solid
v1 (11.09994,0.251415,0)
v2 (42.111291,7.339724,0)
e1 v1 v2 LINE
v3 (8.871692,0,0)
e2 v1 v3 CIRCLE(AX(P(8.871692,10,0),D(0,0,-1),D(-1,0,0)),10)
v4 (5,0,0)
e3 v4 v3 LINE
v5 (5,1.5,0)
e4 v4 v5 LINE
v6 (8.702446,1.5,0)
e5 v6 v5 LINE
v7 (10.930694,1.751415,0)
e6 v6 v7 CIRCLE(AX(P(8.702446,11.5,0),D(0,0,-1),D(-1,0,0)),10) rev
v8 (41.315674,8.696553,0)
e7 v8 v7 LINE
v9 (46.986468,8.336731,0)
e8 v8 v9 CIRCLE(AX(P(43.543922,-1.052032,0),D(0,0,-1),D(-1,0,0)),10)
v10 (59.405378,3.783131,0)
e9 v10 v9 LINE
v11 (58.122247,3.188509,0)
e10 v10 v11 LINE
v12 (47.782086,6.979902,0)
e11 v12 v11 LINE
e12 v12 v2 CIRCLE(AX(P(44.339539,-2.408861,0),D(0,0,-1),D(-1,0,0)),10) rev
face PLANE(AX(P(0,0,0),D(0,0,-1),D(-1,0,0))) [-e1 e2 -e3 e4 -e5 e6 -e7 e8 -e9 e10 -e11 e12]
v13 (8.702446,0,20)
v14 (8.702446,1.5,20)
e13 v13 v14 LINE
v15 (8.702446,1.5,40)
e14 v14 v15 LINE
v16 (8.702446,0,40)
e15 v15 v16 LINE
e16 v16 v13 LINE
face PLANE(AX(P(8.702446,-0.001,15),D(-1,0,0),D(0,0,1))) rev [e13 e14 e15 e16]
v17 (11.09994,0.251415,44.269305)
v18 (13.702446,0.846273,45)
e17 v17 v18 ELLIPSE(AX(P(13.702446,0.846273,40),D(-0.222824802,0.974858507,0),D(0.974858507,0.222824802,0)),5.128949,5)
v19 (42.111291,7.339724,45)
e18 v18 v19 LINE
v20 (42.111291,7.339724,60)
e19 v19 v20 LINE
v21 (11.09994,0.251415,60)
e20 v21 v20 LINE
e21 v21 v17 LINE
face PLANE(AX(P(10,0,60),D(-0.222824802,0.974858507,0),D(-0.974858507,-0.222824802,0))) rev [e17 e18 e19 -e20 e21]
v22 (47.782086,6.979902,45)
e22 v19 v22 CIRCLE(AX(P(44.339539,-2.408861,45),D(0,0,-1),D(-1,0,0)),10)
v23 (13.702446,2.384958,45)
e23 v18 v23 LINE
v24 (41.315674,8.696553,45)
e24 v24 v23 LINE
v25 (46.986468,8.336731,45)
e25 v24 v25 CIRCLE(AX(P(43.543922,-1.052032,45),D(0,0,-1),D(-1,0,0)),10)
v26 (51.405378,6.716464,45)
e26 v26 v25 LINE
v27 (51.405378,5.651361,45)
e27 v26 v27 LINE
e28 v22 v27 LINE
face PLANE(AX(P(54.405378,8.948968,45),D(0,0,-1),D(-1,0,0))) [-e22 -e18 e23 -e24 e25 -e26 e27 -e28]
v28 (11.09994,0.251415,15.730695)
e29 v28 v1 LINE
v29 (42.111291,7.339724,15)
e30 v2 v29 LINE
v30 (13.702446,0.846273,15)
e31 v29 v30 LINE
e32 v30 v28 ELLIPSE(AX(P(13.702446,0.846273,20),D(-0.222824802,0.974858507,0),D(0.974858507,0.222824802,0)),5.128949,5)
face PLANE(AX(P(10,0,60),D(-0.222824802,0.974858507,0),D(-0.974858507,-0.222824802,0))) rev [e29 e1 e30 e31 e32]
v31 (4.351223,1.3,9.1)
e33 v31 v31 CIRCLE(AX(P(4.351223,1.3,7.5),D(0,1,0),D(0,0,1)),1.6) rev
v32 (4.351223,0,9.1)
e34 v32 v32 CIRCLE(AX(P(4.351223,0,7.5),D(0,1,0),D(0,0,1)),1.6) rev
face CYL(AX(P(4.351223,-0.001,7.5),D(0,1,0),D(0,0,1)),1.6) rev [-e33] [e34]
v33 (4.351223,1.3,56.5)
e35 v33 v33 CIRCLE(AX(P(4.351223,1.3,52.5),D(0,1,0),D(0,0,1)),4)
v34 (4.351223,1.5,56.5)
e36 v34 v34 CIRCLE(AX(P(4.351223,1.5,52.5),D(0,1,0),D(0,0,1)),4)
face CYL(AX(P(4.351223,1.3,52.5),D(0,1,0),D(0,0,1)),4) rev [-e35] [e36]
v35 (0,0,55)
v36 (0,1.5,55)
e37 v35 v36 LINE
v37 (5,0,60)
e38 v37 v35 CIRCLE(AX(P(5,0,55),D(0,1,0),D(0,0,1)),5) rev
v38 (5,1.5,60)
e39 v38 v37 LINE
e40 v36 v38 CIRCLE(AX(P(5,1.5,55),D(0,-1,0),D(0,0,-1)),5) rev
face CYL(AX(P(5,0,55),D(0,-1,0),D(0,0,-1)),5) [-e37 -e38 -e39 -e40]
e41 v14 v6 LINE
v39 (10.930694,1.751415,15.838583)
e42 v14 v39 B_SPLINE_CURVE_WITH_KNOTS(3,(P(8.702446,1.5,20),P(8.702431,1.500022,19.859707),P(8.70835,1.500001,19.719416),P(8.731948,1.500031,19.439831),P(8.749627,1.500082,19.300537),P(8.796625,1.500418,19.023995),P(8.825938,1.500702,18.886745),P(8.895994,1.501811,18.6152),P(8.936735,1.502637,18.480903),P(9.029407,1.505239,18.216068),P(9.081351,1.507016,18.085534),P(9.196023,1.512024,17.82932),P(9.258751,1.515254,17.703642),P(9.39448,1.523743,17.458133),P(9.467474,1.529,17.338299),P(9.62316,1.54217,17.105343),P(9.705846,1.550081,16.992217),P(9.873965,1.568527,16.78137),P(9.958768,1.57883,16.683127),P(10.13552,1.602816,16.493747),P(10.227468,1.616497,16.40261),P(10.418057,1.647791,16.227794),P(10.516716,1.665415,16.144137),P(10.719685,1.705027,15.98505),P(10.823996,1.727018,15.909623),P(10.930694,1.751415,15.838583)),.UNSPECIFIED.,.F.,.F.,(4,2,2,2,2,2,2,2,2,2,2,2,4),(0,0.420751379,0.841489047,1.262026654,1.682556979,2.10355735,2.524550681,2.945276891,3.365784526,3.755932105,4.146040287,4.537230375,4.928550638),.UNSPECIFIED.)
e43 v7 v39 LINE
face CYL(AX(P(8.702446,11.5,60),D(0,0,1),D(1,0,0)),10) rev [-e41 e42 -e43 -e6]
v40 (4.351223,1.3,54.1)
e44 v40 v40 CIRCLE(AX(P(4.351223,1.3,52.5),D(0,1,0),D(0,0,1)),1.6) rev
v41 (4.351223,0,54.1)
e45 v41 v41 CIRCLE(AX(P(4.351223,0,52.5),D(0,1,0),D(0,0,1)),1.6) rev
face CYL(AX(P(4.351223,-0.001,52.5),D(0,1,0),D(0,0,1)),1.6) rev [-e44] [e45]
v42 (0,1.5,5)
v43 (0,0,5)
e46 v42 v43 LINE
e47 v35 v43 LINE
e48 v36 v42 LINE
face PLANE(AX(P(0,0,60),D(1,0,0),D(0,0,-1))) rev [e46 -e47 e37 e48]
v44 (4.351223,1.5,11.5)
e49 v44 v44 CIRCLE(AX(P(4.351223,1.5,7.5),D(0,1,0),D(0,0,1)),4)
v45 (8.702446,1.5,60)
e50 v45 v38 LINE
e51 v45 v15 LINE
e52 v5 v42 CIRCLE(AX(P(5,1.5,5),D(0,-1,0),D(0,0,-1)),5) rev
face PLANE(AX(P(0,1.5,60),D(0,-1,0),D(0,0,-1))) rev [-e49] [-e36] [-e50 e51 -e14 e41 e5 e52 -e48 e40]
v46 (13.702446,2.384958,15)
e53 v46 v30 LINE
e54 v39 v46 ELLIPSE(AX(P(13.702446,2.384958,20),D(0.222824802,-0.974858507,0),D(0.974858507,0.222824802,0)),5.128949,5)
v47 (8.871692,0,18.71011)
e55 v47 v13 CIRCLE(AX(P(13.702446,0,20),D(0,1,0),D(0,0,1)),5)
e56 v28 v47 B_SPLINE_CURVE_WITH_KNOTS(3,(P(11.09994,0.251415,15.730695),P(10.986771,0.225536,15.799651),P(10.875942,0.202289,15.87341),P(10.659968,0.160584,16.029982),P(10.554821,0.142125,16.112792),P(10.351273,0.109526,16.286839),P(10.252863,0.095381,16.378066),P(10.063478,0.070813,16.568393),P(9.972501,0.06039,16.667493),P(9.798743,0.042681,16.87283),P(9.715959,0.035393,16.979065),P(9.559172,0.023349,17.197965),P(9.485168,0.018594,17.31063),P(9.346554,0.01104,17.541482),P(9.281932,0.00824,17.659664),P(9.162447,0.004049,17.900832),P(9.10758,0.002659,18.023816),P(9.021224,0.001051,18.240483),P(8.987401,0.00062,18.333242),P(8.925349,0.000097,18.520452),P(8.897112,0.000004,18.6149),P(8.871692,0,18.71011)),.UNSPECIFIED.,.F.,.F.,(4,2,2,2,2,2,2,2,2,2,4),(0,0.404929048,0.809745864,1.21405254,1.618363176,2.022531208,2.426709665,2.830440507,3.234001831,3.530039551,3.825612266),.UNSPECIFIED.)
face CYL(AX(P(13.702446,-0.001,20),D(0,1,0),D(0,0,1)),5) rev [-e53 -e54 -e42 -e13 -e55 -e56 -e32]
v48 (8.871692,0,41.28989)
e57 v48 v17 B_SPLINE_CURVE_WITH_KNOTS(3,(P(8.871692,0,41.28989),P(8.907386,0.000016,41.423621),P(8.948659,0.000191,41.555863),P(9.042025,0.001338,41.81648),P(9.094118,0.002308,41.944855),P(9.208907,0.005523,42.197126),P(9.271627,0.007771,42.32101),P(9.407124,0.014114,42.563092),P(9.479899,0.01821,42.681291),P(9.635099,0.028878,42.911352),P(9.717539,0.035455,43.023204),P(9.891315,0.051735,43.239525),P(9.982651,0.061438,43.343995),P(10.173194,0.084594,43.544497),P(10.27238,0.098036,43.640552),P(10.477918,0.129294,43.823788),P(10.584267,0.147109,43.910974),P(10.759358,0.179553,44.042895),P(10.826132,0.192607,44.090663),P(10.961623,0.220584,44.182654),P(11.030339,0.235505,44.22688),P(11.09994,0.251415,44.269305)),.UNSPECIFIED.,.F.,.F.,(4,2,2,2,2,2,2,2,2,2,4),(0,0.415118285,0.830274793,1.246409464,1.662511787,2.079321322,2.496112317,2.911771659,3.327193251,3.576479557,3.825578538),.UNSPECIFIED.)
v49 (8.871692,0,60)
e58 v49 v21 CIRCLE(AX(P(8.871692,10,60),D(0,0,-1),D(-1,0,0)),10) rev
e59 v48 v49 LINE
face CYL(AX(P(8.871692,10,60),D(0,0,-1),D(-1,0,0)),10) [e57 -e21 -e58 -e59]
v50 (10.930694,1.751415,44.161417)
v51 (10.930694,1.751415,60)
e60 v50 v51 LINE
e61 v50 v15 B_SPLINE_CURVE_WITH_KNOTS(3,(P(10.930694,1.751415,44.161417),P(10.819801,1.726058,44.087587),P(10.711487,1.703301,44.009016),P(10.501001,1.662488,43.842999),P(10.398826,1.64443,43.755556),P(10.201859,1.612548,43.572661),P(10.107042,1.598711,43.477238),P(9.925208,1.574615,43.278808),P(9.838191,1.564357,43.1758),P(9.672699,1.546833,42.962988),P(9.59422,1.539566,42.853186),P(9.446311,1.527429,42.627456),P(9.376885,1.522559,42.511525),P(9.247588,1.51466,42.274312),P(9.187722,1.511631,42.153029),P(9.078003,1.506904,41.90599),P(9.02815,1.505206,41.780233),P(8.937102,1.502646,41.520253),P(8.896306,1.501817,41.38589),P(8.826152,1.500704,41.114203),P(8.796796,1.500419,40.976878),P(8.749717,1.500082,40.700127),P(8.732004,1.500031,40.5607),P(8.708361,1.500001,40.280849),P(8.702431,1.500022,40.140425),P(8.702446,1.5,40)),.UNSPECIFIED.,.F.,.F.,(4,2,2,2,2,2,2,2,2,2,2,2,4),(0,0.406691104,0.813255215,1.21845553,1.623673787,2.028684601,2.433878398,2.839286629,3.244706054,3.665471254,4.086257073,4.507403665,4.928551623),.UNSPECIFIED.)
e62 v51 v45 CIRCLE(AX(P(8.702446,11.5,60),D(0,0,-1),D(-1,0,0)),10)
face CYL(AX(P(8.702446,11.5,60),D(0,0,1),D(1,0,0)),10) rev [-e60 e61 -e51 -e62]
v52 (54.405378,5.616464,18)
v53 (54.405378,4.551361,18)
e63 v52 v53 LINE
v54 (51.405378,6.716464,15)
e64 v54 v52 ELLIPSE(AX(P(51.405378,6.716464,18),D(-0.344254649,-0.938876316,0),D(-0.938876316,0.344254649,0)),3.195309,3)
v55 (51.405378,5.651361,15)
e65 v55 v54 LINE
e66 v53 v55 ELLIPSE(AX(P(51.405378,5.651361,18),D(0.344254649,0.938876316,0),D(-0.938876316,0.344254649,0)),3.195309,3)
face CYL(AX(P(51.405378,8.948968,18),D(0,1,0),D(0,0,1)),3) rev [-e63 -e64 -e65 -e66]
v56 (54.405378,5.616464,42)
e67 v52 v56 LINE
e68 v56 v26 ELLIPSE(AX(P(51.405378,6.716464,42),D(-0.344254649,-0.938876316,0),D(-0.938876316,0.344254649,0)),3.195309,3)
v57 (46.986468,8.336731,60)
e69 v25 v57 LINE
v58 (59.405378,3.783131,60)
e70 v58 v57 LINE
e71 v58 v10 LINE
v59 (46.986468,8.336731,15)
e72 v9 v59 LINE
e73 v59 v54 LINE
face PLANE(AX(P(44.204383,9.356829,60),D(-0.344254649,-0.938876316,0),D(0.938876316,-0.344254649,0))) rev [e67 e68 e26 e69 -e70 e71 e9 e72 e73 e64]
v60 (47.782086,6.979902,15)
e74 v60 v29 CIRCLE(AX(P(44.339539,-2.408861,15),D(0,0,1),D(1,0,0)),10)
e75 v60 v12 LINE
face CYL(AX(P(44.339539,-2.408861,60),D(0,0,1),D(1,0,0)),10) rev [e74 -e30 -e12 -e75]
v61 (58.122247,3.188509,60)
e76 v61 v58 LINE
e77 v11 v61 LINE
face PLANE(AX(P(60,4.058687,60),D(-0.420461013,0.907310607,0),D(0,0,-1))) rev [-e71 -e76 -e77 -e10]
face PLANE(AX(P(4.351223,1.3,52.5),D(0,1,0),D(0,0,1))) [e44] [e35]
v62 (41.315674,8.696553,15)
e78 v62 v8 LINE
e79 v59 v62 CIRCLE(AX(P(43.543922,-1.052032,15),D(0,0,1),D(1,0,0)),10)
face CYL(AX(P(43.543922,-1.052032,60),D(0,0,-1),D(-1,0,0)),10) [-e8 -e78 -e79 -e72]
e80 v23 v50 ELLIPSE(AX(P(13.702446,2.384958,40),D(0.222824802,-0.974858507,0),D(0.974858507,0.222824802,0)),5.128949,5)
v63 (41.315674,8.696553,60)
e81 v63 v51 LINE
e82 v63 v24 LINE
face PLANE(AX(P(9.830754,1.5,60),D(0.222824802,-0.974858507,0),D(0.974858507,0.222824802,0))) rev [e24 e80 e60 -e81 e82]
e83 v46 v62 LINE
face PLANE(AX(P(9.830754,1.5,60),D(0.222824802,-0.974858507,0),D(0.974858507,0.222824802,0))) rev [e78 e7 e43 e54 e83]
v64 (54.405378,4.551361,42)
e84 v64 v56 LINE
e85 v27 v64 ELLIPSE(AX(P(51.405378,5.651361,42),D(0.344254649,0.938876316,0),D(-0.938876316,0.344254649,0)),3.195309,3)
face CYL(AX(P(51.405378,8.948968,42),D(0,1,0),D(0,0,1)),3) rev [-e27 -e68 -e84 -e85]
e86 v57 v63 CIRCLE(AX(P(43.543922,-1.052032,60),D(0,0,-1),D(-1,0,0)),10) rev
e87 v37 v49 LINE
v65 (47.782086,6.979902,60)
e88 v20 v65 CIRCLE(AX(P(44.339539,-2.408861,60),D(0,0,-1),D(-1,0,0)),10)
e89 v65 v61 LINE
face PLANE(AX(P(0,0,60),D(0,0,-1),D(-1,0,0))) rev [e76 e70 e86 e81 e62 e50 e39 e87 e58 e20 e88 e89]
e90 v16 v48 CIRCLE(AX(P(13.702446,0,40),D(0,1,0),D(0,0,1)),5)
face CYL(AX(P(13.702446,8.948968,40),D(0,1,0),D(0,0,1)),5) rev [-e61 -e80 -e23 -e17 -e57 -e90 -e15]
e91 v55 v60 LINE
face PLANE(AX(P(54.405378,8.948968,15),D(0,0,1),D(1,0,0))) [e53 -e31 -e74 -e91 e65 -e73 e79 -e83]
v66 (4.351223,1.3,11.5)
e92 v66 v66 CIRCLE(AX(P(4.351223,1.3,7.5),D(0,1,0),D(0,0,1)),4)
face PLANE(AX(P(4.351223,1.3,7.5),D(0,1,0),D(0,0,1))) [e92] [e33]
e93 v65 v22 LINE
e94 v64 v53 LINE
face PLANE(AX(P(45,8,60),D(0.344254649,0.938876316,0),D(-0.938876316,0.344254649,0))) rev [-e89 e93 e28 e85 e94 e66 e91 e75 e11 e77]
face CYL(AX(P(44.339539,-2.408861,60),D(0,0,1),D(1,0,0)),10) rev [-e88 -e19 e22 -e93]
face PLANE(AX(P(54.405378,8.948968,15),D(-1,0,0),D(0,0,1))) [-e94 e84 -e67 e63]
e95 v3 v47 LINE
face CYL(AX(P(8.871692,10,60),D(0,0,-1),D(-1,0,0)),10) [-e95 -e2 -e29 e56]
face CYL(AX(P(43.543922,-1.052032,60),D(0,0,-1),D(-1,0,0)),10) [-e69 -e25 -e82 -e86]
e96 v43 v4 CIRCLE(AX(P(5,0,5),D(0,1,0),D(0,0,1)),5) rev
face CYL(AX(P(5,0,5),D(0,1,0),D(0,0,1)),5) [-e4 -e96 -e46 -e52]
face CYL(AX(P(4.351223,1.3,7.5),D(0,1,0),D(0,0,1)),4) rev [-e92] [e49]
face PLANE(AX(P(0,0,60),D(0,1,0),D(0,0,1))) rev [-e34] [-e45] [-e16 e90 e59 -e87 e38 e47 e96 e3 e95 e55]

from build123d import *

# Parameters (mm, degrees)
EXTRUDE_1_DEPTH                 = 60
FILLET_1_R                      = 10
CHAMFER_1_SIZE                  = 2
CHAMFER_1_SIZE_2                = 1.558687347
CUT_EXTRUDE_1_REACH             = 86.761
SKETCH_2_R                      = 1.6
SKETCH_3_R                      = 4
CUT_EXTRUDE_2_DEPTH             = 0.2
CUT_EXTRUDE_3_REACH             = 86.761
SKETCH_4_W                      = 45.702932162
SKETCH_4_H                      = 30
CUT_EXTRUDE_3_DIRECTION_2_REACH = 86.761
FILLET_2_OUTLINE_W              = 8.702446171
FILLET_2_OUTLINE_H              = 1.5
FILLET_2_DEPTH                  = 5
FILLET_START                    = 55
FILLET_2_2_OUTLINE_W            = 8.702446171
FILLET_2_2_OUTLINE_H            = 1.5
FILLET_2_2_DEPTH                = 5
FILLET_2_3_DEPTH                = 1.3
FILLET_START_2                  = 1.3
FILLET_2_4_DEPTH                = 0.2
FILLET_START_3                  = 1.478876
FILLET_2_5_DEPTH                = 0.906082345
FILLET_START_4                  = 15
FILLET_2_6_DEPTH                = 30
FILLET_3_R                      = 3


with BuildPart() as part:
    # 草图1 → 凸台-拉伸1 (new body)
    with BuildSketch(Plane.XY):
        Polygon((0, 0), (10, 0), (45, 8), (60, 2.5), (60, 3.565103021), (44.204382552, 9.356829418), (9.830753848, 1.5), (0, 1.5), align=None)
    extrude(amount=EXTRUDE_1_DEPTH)

    # 圆角1
    fillet_1_edges = [part.edges().sort_by_distance(p)[0] for p in [
        (9.830753848, 1.5, 30),
        (44.204382552, 9.356829418, 30),
        (45, 8, 30),
        (10, 0, 30),
    ]]
    fillet(fillet_1_edges, radius=FILLET_1_R)

    # 倒角1
    # the kernel refuses this chamfer: 2, 1.558687347 mm, written as the material it takes off along each edge
    with BuildSketch(Plane(origin=(60, 2.5, -5.143365976), x_dir=(-0.9388763158866087, 0.3442546491584233, 0), z_dir=(0, 0, 1))) as chamfer_1_piece_1:
        Polygon((CHAMFER_1_SIZE, 0), (CHAMFER_1_SIZE_2 * 0.3442546492, -CHAMFER_1_SIZE_2 * 0.938876315999), (0, 0), align=None)
    extrude(amount=70.286731952, mode=Mode.SUBTRACT)

    # 草图2 → 切除-拉伸1 (cut, up to next)
    with BuildSketch(Plane(origin=(0, 1.5, 0), x_dir=(1, 0, 0), z_dir=(0, 1, 0)), mode=Mode.PRIVATE) as cut_extrude_1_sk1:
        with Locations(Location((4.351223085, -7.5, 0), (0, 0, 270))):
            Circle(SKETCH_2_R)
    cut_extrude_1_tool1 = extrude(cut_extrude_1_sk1.sketch, amount=-CUT_EXTRUDE_1_REACH, mode=Mode.PRIVATE) & part.part
    # 草图2 → 切除-拉伸1 (cut, up to next)
    with BuildSketch(Plane(origin=(0, 1.5, 0), x_dir=(1, 0, 0), z_dir=(0, 1, 0)), mode=Mode.PRIVATE) as cut_extrude_1_sk2:
        with Locations(Location((4.351223085, -52.5, 0), (0, 0, 270))):
            Circle(SKETCH_2_R)
    cut_extrude_1_tool2 = extrude(cut_extrude_1_sk2.sketch, amount=-CUT_EXTRUDE_1_REACH, mode=Mode.PRIVATE) & part.part
    add(cut_extrude_1_tool1.solids().sort_by_distance((4.351223, 1.5, 7.5))[0], mode=Mode.SUBTRACT)
    add(cut_extrude_1_tool2.solids().sort_by_distance((4.351223, 1.5, 52.5))[0], mode=Mode.SUBTRACT)

    # 草图3 → 切除-拉伸2 (cut)
    with BuildSketch(Plane(origin=(0, 1.5, 0), x_dir=(1, 0, 0), z_dir=(0, 1, 0))):
        with Locations(Location((4.351223085, -7.5, 0), (0, 0, 270))):
            Circle(SKETCH_3_R)
        with Locations(Location((4.351223085, -52.5, 0), (0, 0, 270))):
            Circle(SKETCH_3_R)
    extrude(amount=-CUT_EXTRUDE_2_DEPTH, mode=Mode.SUBTRACT)

    # 草图4 → 切除-拉伸3 (cut, up to next)
    with BuildSketch(Plane(origin=(0, 1.5, 0), x_dir=(1, 0, 0), z_dir=(0, 1, 0)), mode=Mode.PRIVATE) as cut_extrude_3_sk1:
        with Locations((31.553912252, -30)):
            Rectangle(SKETCH_4_W, SKETCH_4_H)
    cut_extrude_3_tool1 = extrude(cut_extrude_3_sk1.sketch, amount=-CUT_EXTRUDE_3_REACH, mode=Mode.PRIVATE) & part.part
    add(cut_extrude_3_tool1.solids().sort_by_distance((31.553912, 1.5, 30))[0], mode=Mode.SUBTRACT)

    # 草图4 → 切除-拉伸3 direction 2 (cut, up to next)
    with BuildSketch(Plane(origin=(0, 1.5, 0), x_dir=(1, 0, 0), z_dir=(0, 1, 0)), mode=Mode.PRIVATE) as cut_extrude_3_direction_2_sk1:
        with Locations((31.553912252, -30)):
            Rectangle(SKETCH_4_W, SKETCH_4_H)
    cut_extrude_3_direction_2_tool1 = extrude(cut_extrude_3_direction_2_sk1.sketch, amount=CUT_EXTRUDE_3_DIRECTION_2_REACH, mode=Mode.PRIVATE) & part.part
    add(cut_extrude_3_direction_2_tool1.solids().sort_by_distance((31.553912, 1.5, 30))[0], mode=Mode.SUBTRACT)

    # 圆角2: read off the stored shape, not the designer's step
    # 圆角2 outline → 圆角2 (cut)
    with BuildSketch(Plane.XY):
        with Locations((4.351223086, 0.75)):
            Rectangle(FILLET_2_OUTLINE_W, FILLET_2_OUTLINE_H)
    extrude(amount=FILLET_2_DEPTH, mode=Mode.SUBTRACT)

    # Fillet 2 2 outline → Fillet 2 2 (cut)
    with BuildSketch(Plane.XY.offset(FILLET_START)):
        with Locations((4.351223086, 0.75)):
            Rectangle(FILLET_2_2_OUTLINE_W, FILLET_2_2_OUTLINE_H)
    extrude(amount=FILLET_2_2_DEPTH, mode=Mode.SUBTRACT)

    # Fillet 2 3 outline → Fillet 2 3 (add)
    with BuildSketch(Plane(origin=(0, 0, 0), x_dir=(1, 0, 0), z_dir=(0, 1, 0))):
        with BuildLine():
            Line((5, -60), (8.702446171, -60))
            Line((8.702446171, -60), (8.702446171, -55))
            Line((8.702446171, -55), (0, -55))
            ThreePointArc((0, -55), (1.464466094, -58.535533906), (5, -60))
        make_face()
        with BuildLine():
            Line((8.702446171, -5), (8.702446171, 0))
            Line((8.702446171, 0), (5, 0))
            ThreePointArc((5, 0), (1.464466094, -1.464466094), (0, -5))
            Line((0, -5), (8.702446171, -5))
        make_face()
        with BuildLine():
            ThreePointArc((13.702446171, -45), (10.166912265, -43.535533906), (8.702446171, -40))
            Line((8.702446171, -40), (8.702446171, -45))
            Line((8.702446171, -45), (13.702446171, -45))
        make_face()
        with BuildLine():
            ThreePointArc((8.702446171, -20), (10.166912265, -16.464466094), (13.702446171, -15))
            Line((13.702446171, -15), (8.702446171, -15))
            Line((8.702446171, -15), (8.702446171, -20))
        make_face()
    extrude(amount=FILLET_2_3_DEPTH)

    # Fillet 2 4 outline → Fillet 2 4 (add)
    with BuildSketch(Plane(origin=(0, 0, 0), x_dir=(1, 0, 0), z_dir=(0, 1, 0)).offset(FILLET_START_2)):
        with BuildLine():
            Line((5, -60), (8.702446171, -60))
            Line((8.702446171, -60), (8.702446171, -55))
            Line((8.702446171, -55), (7.473722084, -55))
            ThreePointArc((7.473722084, -55), (4.351223085, -56.5), (1.228724086, -55))
            Line((1.228724086, -55), (0, -55))
            ThreePointArc((0, -55), (1.464466094, -58.535533906), (5, -60))
        make_face()
        with BuildLine():
            Line((8.702446171, -5), (8.702446171, 0))
            Line((8.702446171, 0), (5, 0))
            ThreePointArc((5, 0), (1.464466094, -1.464466094), (0, -5))
            Line((0, -5), (1.228724086, -5))
            ThreePointArc((1.228724086, -5), (4.351223085, -3.5), (7.473722084, -5))
            Line((7.473722084, -5), (8.702446171, -5))
        make_face()
        with BuildLine():
            ThreePointArc((13.702446171, -45), (10.166912265, -43.535533906), (8.702446171, -40))
            Line((8.702446171, -40), (8.702446171, -45))
            Line((8.702446171, -45), (13.702446171, -45))
        make_face()
        with BuildLine():
            ThreePointArc((8.702446171, -20), (10.166912265, -16.464466094), (13.702446171, -15))
            Line((13.702446171, -15), (8.702446171, -15))
            Line((8.702446171, -15), (8.702446171, -20))
        make_face()
    extrude(amount=FILLET_2_4_DEPTH)

    # Fillet 2 5 outline → Fillet 2 5 (add)
    with BuildSketch(Plane(origin=(0, 0, 0), x_dir=(1, 0, 0), z_dir=(0, 1, 0)).offset(FILLET_START_3)):
        with BuildLine():
            ThreePointArc((13.702446171, -45), (10.166912265, -43.535533906), (8.702446171, -40))
            Line((8.702446171, -40), (8.702446171, -45))
            Line((8.702446171, -45), (13.702446171, -45))
        make_face()
        with BuildLine():
            ThreePointArc((8.702446171, -20), (10.166912265, -16.464466094), (13.702446171, -15))
            Line((13.702446171, -15), (8.702446171, -15))
            Line((8.702446171, -15), (8.702446171, -20))
        make_face()
    extrude(amount=FILLET_2_5_DEPTH)

    # Fillet 2 6 outline → Fillet 2 6 (cut)
    with BuildSketch(Plane.XY.offset(FILLET_START_4)):
        with BuildLine():
            Line((10.930694186, 1.751414934), (13.702446193, 2.38495825))
            Line((13.702446193, 2.38495825), (8.702446171, 2.384958345))
            Line((8.702446171, 2.384958345), (8.702446171, 1.5))
            ThreePointArc((8.702446171, 1.5), (9.823639585, 1.563052515), (10.930694186, 1.751414934))
        make_face()
        with BuildLine():
            Line((8.871692322, 0), (13.702446171, 0))
            Line((13.702446171, 0), (13.702446171, 0.846273411))
            Line((13.702446171, 0.846273411), (11.099940337, 0.251414934))
            ThreePointArc((11.099940337, 0.251414934), (9.992885736, 0.063052515), (8.871692322, 0))
        make_face()
    extrude(amount=FILLET_2_6_DEPTH, mode=Mode.SUBTRACT)

    # 圆角3
    # the kernel refuses this fillet: 3 mm, written as the material it adds along each edge
    with BuildSketch(Plane(origin=(54.405378333, -2.948638722, 45), x_dir=(-1, 0, 0), z_dir=(0, 1, 0))) as fillet_3_piece_1_section:
        with BuildLine():
            CenterArc((FILLET_3_R, -FILLET_3_R), FILLET_3_R, 90, 90)
            Line((0, -FILLET_3_R), (0, 0))
            Line((0, 0), (FILLET_3_R, 0))
        make_face()
    fillet_3_piece_1 = extrude(amount=16.065103021, mode=Mode.PRIVATE)
    fillet_3_piece_1 = split(fillet_3_piece_1, bisect_by=Plane(origin=(56.829472359, 3.662526802, 45), z_dir=(0.34425464915842324, 0.9388763158866087, 0)), keep=Keep.TOP, mode=Mode.PRIVATE)
    fillet_3_piece_1 = split(fillet_3_piece_1, bisect_by=Plane(origin=(57.173727008, 4.601403118, 45), z_dir=(-0.344254649158423, -0.9388763158866088, 0)), keep=Keep.TOP, mode=Mode.PRIVATE)
    add(fillet_3_piece_1)
    with BuildSketch(Plane(origin=(54.405378333, -2.948638722, 15), x_dir=(-1, 0, 0), z_dir=(0, 1, 0))) as fillet_3_piece_2_section:
        with BuildLine():
            CenterArc((FILLET_3_R, FILLET_3_R), FILLET_3_R, 180, 90)
            Line((0, FILLET_3_R), (0, 0))
            Line((0, 0), (FILLET_3_R, 0))
        make_face()
    fillet_3_piece_2 = extrude(amount=16.065103021, mode=Mode.PRIVATE)
    fillet_3_piece_2 = split(fillet_3_piece_2, bisect_by=Plane(origin=(57.173727008, 4.601403118, 15), z_dir=(-0.344254649158423, -0.9388763158866088, 0)), keep=Keep.TOP, mode=Mode.PRIVATE)
    fillet_3_piece_2 = split(fillet_3_piece_2, bisect_by=Plane(origin=(56.829472359, 3.662526802, 15), z_dir=(0.34425464915842324, 0.9388763158866087, 0)), keep=Keep.TOP, mode=Mode.PRIVATE)
    add(fillet_3_piece_2)


solid = part.part
